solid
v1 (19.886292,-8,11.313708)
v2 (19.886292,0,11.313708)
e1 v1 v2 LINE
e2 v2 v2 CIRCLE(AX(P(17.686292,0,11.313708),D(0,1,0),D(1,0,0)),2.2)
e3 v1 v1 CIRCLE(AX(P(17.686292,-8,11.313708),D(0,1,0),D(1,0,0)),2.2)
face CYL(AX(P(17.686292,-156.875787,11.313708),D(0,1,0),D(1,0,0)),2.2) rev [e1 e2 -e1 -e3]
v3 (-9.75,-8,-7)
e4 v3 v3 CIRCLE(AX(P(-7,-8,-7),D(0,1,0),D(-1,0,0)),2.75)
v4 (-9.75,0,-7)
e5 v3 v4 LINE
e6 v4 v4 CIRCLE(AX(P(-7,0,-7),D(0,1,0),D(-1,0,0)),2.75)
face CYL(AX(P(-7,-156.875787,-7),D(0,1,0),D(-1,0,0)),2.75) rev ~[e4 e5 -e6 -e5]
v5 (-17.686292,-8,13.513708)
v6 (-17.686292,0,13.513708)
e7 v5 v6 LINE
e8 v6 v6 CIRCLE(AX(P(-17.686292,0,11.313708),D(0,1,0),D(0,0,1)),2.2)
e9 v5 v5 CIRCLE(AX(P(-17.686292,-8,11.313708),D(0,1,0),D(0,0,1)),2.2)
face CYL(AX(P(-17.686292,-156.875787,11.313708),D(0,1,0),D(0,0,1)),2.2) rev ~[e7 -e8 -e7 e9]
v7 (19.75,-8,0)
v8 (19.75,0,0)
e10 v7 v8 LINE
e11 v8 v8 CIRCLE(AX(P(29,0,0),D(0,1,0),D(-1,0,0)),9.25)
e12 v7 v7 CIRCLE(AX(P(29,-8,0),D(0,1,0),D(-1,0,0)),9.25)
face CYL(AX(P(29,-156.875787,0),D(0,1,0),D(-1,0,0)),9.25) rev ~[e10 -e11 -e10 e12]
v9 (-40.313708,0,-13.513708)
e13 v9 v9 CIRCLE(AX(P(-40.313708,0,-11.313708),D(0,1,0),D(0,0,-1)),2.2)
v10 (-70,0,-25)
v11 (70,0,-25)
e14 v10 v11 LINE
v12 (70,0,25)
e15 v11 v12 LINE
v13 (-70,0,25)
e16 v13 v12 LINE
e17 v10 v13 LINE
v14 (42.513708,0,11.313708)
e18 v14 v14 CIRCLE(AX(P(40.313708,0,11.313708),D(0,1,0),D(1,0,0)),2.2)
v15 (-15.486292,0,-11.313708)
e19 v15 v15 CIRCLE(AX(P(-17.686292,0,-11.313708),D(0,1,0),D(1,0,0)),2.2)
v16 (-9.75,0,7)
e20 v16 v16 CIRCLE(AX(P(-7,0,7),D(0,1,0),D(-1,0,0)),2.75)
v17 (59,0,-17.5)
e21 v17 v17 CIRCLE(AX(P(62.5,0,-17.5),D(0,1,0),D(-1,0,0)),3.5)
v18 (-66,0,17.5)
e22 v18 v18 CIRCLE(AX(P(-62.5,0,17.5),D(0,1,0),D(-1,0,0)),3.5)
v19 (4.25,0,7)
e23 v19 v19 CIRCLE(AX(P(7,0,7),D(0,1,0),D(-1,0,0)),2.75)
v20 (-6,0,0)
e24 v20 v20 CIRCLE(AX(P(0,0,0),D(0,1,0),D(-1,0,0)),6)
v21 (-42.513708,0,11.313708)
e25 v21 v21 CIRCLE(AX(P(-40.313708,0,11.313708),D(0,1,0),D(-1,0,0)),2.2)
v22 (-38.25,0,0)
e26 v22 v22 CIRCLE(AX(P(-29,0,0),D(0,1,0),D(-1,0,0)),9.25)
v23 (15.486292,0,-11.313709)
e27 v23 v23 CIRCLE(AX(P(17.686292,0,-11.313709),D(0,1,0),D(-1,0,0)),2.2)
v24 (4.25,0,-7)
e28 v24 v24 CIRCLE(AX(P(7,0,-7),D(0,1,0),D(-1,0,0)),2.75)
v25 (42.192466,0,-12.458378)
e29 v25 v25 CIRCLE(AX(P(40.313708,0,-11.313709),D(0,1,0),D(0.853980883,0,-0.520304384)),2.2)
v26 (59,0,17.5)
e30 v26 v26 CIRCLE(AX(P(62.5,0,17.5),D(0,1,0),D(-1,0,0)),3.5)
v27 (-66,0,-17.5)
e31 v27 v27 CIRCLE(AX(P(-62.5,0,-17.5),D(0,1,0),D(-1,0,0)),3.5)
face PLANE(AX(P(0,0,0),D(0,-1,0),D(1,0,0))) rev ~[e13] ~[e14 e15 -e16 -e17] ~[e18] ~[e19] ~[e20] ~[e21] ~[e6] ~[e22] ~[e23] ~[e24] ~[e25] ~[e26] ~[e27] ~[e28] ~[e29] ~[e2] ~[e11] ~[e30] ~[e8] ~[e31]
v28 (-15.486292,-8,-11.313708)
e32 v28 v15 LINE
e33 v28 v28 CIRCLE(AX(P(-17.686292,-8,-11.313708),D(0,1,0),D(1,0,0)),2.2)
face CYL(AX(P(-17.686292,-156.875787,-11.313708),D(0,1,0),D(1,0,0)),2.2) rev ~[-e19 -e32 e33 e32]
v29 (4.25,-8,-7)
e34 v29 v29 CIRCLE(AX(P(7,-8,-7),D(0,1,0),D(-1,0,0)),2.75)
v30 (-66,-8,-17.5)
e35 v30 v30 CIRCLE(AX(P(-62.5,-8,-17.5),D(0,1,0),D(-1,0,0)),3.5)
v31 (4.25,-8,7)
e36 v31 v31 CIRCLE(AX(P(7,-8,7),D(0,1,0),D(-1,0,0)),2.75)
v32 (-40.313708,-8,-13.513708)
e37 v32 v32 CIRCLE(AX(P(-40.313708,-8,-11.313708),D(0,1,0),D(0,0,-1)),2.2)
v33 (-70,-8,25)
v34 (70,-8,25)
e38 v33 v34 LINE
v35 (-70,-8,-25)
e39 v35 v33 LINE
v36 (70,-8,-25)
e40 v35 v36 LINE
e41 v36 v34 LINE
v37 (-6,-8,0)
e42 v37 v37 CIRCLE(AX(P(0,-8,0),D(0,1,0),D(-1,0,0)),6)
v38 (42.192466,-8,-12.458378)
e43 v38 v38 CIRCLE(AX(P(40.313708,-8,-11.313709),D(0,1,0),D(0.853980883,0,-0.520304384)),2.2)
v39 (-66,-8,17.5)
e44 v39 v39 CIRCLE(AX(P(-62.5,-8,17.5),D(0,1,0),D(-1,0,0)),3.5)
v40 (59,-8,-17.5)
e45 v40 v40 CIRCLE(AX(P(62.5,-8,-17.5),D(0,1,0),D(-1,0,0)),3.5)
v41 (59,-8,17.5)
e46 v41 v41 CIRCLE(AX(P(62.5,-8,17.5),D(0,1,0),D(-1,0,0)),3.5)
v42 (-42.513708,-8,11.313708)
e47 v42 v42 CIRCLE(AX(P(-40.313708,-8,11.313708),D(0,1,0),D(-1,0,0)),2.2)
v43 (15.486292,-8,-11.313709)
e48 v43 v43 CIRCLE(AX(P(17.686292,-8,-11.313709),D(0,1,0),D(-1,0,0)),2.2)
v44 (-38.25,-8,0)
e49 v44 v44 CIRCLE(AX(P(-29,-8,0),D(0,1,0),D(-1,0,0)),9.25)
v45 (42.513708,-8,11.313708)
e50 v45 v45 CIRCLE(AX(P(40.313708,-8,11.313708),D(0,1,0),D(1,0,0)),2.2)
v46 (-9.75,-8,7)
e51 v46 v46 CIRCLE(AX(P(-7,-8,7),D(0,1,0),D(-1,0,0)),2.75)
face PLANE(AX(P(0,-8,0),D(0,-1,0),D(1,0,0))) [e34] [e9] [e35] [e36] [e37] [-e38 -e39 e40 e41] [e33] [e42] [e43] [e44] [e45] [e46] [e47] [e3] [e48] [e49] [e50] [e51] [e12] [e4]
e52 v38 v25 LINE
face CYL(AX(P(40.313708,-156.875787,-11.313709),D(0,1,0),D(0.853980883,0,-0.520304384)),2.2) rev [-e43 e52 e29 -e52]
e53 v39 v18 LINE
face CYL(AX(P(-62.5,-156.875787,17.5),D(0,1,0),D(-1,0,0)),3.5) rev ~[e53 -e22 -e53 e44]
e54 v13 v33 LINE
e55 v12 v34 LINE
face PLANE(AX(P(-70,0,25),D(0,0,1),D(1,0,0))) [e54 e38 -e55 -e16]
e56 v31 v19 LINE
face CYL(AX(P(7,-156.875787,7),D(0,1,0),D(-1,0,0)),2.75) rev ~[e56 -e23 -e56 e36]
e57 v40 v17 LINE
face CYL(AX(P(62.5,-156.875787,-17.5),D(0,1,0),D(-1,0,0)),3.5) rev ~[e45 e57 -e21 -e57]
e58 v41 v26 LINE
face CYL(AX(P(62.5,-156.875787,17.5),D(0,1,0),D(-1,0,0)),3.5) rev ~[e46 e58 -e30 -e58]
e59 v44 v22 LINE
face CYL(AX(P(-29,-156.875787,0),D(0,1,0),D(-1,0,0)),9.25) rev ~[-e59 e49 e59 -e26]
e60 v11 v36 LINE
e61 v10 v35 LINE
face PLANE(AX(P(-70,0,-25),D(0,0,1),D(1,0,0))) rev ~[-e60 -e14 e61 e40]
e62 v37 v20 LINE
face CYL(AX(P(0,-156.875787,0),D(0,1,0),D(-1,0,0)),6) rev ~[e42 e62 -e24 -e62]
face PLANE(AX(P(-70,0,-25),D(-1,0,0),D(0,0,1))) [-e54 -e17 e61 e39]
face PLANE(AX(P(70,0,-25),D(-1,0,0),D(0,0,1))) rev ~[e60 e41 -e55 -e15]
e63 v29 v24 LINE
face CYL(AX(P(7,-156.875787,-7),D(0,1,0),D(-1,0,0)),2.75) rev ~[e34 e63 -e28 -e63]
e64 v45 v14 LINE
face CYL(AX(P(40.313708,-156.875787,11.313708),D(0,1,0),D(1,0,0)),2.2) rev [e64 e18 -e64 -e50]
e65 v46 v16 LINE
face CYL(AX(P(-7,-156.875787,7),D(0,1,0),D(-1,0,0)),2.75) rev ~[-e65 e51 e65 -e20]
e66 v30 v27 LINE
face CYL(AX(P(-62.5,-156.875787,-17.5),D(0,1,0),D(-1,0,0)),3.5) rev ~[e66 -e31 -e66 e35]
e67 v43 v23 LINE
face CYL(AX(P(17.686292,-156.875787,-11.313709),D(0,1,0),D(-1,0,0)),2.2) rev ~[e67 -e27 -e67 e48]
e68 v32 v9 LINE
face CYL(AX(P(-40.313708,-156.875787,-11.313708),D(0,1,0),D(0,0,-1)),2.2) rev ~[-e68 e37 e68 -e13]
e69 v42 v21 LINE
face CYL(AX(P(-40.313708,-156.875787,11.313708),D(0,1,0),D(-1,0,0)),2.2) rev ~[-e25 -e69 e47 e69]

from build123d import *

# Parameters (mm, degrees)
F0_W             = 140
F0_H             = 50
F1_DEPTH         = 8
F3_D             = 12
F4_D             = 5.5
F5_D             = 7
F6_D             = 18.5
F7_D             = 4.4
F7_COPIES_COUNT  = 4
F7_COPIES4_COUNT = 2
F7_COPIES4_PITCH = 62.25753


# Not quite as in the source:
# - a pattern or mirror of a feature is missing from the dataset's text; its kind, count and spacing are read off the source's solid


with BuildPart() as f1:
    # F0 (on Front) → F1 (new body)
    with BuildSketch(Plane.XZ):
        Rectangle(F0_W, F0_H)
    extrude(amount=F1_DEPTH)

    # F3 (through all)
    with Locations(Plane.XZ.offset(8)):
        with Locations((0, 0)):
            Hole(F3_D / 2)

    # F4 (through all)
    with Locations(Plane.XZ.offset(8)):
        with Locations((-7, 7), (-7, -7), (7, -7), (7, 7)):
            Hole(F4_D / 2)

    # F5 (through all)
    with Locations(Plane.XZ.offset(8)):
        with Locations((-62.5, -17.5), (62.5, -17.5), (62.5, 17.5), (-62.5, 17.5)):
            Hole(F5_D / 2)

    # F6 (through all)
    with Locations(Plane.XZ.offset(8)):
        with Locations((-29, 0), (29, 0)):
            Hole(F6_D / 2)

    # F7 (through all)
    with Locations(Plane.XZ.offset(8)):
        with Locations((-40.313708499, 11.313708499)):
            f7 = Hole(F7_D / 2)

    # F7_copies: F7 ×4 about axis
    f7_copies_axis = Axis((-29, 0, 0), (0, 1, 0))
    for i in range(1, F7_COPIES_COUNT):
        add(f7.rotate(f7_copies_axis, i * 360 / F7_COPIES_COUNT), mode=Mode.SUBTRACT)

    # F7_copies1: F7 across plane
    add(f7.mirror(Plane(origin=(0, 0, 0), x_dir=(0, 0, 1), z_dir=(1, 0, 0))), mode=Mode.SUBTRACT)

    # F7_copies2: F7 across plane
    add(f7.mirror(Plane(origin=(-11.313708, 0, 0), x_dir=(0, 0, 1), z_dir=(1, 0, 0))), mode=Mode.SUBTRACT)

    # F7_copies3: F7 across plane
    add(f7.mirror(Plane(origin=(0, 0, 0), x_dir=(0.2702028103, 0, 0.9628034282), z_dir=(0.9628034282, 0, -0.2702028103))), mode=Mode.SUBTRACT)

    # F7_copies4: F7 ×2
    with Locations(*[Vector(0.931614221, 0, -0.3634486803) * (i * F7_COPIES4_PITCH) for i in range(1, F7_COPIES4_COUNT)]):
        add(f7, mode=Mode.SUBTRACT)


solid = f1.part
